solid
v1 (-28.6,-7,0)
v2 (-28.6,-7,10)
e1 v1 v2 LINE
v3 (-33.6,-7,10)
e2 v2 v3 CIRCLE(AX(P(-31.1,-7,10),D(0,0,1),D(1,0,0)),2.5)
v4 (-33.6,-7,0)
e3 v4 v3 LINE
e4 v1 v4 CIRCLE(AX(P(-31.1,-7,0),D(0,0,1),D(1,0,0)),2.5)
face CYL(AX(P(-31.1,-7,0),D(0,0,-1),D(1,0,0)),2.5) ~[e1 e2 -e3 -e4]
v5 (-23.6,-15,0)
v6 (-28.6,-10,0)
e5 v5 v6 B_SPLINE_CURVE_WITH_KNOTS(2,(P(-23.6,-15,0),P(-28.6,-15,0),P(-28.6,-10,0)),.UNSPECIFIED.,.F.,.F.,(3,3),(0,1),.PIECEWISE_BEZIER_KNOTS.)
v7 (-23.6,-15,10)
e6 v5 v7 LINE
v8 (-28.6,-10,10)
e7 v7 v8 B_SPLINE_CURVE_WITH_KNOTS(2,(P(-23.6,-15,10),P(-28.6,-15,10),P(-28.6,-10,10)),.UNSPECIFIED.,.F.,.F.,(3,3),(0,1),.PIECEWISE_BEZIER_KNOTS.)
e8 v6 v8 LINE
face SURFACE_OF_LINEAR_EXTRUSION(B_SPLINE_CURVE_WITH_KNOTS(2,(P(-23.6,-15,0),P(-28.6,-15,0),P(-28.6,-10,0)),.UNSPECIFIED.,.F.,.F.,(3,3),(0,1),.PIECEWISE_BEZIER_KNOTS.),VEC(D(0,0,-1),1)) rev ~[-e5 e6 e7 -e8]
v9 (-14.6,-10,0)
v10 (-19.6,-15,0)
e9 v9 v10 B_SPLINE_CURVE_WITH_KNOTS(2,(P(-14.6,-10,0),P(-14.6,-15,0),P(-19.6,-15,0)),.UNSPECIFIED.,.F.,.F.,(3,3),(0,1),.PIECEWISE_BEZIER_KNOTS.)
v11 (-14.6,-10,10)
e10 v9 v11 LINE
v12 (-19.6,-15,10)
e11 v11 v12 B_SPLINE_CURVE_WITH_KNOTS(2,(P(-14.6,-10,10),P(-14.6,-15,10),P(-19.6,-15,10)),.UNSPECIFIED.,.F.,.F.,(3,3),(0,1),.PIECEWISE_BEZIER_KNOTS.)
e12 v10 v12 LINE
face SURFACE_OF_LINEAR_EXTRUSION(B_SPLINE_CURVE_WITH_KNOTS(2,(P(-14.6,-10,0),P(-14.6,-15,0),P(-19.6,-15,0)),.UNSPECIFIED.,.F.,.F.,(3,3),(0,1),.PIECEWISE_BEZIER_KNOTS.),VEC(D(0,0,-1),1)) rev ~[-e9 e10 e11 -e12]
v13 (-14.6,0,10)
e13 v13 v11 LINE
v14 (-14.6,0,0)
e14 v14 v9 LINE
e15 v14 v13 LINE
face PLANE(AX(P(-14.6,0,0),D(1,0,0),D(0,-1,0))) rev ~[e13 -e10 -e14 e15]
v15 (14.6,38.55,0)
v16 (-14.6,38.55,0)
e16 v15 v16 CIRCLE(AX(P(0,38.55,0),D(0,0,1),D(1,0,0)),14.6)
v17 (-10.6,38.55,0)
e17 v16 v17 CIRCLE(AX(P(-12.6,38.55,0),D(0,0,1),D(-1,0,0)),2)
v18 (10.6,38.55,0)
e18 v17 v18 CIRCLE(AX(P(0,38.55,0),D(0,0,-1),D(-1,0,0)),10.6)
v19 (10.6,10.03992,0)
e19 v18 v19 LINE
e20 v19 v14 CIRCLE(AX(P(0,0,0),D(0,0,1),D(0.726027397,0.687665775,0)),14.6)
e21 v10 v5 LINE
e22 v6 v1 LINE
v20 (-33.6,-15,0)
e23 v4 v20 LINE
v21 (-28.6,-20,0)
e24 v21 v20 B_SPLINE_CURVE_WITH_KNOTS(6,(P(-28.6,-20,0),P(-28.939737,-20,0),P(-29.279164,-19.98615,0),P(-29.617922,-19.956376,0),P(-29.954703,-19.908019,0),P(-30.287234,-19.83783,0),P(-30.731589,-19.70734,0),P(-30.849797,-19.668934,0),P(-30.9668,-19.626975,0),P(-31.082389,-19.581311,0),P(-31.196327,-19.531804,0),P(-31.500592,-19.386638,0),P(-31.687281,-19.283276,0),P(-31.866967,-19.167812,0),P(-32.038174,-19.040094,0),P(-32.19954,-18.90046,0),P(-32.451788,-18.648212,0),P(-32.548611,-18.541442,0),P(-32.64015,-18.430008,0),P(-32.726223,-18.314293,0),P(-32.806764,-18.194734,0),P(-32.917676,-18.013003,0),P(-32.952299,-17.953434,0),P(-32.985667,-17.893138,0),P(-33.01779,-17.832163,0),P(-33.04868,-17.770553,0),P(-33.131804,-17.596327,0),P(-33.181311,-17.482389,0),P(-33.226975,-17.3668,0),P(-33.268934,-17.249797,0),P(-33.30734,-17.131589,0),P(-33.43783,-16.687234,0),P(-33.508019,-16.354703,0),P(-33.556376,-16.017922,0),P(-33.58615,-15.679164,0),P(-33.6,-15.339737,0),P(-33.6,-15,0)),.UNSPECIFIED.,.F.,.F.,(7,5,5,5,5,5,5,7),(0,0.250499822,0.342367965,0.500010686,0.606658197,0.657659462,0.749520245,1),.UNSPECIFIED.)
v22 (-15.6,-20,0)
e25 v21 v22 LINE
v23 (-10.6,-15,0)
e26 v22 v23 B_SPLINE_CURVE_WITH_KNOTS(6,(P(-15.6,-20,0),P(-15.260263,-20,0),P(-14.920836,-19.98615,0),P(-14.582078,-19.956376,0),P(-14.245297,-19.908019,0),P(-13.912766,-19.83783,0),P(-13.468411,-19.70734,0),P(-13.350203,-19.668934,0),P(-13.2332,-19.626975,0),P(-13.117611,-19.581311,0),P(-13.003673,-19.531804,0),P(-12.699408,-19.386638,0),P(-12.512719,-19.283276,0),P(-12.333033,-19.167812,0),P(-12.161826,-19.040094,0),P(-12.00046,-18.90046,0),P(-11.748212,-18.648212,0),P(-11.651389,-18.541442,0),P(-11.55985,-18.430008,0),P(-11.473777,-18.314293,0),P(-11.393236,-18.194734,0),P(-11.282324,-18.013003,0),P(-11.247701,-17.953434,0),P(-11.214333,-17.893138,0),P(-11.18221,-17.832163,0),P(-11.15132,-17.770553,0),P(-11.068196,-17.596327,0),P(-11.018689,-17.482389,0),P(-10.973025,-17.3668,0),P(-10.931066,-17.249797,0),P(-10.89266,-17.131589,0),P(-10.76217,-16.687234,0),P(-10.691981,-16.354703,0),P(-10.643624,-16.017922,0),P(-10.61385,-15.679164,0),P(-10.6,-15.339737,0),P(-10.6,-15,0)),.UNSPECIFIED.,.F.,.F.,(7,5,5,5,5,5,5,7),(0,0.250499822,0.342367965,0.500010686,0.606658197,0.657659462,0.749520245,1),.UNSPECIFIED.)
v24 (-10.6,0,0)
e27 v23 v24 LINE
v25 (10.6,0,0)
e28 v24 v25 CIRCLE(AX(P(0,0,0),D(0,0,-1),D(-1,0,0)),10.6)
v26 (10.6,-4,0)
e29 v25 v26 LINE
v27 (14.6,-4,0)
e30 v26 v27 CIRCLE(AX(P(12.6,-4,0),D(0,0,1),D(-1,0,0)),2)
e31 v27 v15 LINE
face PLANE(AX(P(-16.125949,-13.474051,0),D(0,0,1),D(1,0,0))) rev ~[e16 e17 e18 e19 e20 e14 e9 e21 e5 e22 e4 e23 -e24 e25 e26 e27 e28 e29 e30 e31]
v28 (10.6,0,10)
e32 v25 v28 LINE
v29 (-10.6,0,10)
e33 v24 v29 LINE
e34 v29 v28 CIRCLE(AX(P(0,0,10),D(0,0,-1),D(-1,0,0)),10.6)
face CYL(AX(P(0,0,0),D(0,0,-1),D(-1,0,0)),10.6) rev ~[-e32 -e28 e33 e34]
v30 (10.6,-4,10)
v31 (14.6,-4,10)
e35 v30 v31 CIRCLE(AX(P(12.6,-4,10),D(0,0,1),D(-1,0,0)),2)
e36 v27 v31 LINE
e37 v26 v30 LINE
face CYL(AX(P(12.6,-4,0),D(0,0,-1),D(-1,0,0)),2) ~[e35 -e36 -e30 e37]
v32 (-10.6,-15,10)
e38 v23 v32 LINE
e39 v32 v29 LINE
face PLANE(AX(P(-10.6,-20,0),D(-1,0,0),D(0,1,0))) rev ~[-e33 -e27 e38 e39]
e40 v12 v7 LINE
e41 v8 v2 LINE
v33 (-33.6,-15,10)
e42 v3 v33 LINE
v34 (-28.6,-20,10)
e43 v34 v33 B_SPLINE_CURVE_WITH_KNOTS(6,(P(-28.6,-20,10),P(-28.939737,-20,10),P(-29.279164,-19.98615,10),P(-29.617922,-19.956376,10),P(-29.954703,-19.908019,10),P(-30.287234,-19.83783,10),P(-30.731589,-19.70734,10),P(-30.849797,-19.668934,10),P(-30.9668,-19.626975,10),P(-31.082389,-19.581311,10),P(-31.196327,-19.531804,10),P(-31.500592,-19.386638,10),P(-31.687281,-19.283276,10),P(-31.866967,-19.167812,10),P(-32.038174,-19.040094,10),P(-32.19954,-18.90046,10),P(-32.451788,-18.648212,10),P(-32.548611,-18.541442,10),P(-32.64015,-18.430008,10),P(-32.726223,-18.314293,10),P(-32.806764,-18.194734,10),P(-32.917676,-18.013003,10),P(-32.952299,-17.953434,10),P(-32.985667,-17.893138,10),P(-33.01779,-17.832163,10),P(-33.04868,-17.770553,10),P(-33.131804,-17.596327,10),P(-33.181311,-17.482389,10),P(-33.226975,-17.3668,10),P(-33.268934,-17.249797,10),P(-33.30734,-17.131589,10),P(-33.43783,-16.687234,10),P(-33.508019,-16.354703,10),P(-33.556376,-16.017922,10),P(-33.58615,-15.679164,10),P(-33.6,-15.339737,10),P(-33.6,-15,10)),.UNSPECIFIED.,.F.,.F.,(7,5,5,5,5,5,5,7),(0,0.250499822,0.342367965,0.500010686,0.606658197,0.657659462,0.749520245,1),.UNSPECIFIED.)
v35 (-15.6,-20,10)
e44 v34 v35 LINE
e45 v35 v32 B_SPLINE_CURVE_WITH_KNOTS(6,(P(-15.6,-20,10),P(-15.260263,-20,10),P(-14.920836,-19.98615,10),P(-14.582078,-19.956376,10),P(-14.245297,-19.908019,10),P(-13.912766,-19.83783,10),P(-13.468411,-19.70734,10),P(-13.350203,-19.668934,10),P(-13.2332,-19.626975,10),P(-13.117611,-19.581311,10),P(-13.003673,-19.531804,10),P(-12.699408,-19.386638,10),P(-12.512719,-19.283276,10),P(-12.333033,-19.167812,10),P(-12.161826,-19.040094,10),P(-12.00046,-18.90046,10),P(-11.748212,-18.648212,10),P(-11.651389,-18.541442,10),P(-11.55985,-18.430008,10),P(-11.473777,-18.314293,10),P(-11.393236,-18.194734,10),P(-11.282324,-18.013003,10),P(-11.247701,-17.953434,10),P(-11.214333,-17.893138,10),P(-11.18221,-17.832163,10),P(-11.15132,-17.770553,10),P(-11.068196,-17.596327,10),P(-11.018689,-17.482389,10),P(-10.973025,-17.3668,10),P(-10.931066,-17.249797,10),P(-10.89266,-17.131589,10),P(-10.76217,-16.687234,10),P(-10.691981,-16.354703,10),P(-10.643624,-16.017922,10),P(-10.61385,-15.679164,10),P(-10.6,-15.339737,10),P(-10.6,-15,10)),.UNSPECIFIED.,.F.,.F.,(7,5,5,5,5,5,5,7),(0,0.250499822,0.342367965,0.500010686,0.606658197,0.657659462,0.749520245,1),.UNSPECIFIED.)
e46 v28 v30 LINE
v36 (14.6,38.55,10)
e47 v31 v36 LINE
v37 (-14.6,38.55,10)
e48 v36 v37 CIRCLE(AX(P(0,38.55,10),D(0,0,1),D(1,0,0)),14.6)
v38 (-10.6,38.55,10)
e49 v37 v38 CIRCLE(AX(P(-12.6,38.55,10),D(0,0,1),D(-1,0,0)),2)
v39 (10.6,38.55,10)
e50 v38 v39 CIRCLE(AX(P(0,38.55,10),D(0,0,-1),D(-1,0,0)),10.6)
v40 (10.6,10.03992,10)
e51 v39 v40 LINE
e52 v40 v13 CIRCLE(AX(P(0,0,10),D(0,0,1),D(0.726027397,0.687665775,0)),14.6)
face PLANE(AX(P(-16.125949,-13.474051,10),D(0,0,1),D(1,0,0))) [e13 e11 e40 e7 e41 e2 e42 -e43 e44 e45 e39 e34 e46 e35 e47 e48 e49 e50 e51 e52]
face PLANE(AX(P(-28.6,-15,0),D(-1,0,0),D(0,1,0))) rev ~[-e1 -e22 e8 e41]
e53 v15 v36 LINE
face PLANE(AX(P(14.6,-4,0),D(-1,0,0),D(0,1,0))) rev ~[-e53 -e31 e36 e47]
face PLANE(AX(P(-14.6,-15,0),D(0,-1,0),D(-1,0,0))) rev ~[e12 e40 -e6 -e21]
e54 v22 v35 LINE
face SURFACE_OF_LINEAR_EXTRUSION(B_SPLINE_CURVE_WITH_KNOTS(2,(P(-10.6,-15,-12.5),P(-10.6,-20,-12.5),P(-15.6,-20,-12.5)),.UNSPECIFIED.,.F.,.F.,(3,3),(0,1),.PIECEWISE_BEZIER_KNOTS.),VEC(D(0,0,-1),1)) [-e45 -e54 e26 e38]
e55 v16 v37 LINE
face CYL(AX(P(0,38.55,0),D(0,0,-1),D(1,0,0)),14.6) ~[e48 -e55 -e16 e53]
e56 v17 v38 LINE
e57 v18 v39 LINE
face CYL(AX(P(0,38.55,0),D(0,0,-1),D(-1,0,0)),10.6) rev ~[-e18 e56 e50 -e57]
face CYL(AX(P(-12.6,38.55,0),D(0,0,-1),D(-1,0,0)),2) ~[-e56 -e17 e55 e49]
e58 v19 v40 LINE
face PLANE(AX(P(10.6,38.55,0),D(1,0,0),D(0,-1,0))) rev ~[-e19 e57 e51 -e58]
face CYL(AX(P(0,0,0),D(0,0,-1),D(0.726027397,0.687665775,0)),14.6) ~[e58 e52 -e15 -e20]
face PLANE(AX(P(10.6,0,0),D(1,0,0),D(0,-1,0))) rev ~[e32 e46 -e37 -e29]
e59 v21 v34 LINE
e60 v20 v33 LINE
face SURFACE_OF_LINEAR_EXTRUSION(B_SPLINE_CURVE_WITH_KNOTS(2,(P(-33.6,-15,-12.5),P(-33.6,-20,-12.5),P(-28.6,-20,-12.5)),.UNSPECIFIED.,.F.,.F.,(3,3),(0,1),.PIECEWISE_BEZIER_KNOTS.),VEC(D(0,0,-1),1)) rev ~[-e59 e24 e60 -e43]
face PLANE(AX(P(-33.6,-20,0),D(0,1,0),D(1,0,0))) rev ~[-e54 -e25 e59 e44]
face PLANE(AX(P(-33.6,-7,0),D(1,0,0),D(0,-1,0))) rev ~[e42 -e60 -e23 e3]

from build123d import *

# Parameters (mm, degrees)
F1_DEPTH    = 10
F2_T1_DEPTH = 10
F2_T3_DEPTH = 35


# Not quite as in the source:
# - a fillet or chamfer that OpenCascade refuses, or shapes differently, is made with other operations: its cross-section is extruded or revolved along the edge and cut away or added


with BuildPart() as f1:
    # F0 (on Top) → F1 (new body)
    with BuildSketch(Plane.XY):
        with BuildLine():
            Line((14.6, -4), (14.6, 38.55))
            ThreePointArc((14.6, 38.55), (0, 53.15), (-14.6, 38.55))
            ThreePointArc((-14.6, 38.55), (-12.6, 36.55), (-10.6, 38.55))
            ThreePointArc((-10.6, 38.55), (0, 49.15), (10.6, 38.55))
            Line((10.6, 38.55), (10.6, 10.0399203184))
            ThreePointArc((10.6, 10.0399203184), (-5.4037024344, 13.5631854665), (-14.6, 0))
            Line((-14.6, 0), (-14.6, -15))
            Line((-14.6, -15), (-28.6, -15))
            Line((-28.6, -15), (-28.6, -7))
            ThreePointArc((-28.6, -7), (-31.1, -4.5), (-33.6, -7))
            Line((-33.6, -7), (-33.6, -20))
            Line((-33.6, -20), (-10.6, -20))
            Line((-10.6, -20), (-10.6, 0))
            ThreePointArc((-10.6, 0), (0, 10.6), (10.6, 0))
            Line((10.6, 0), (10.6, -4))
            ThreePointArc((10.6, -4), (12.6, -6), (14.6, -4))
        make_face()
    extrude(amount=F1_DEPTH)

    # F2: fillet of radius 5 on 4 edges, made by hand

    # F2_s2 → F2_t1 (join)
    with BuildSketch(Plane.XY):
        with BuildLine():
            add(Edge.make_bspline(
                [(-14.6, -10), (-14.6, -15), (-19.6, -15)],
                knots=[0, 0, 0, 1, 1, 1], degree=2, weights=[1, 1, 1]))
            Line((-19.6, -15), (-14.6, -15))
            Line((-14.6, -15), (-14.6, -10))
        make_face()
        with BuildLine():
            add(Edge.make_bspline(
                [(-23.6, -15), (-28.6, -15), (-28.6, -10)],
                knots=[0, 0, 0, 1, 1, 1], degree=2, weights=[1, 1, 1]))
            Line((-28.6, -10), (-28.6, -15))
            Line((-28.6, -15), (-23.6, -15))
        make_face()
    extrude(amount=F2_T1_DEPTH)

    # F2_s4 → F2_t3 (cut)
    with BuildSketch(Plane.XY.offset(-12.5)):
        with BuildLine():
            add(Edge.make_bspline(
                [(-33.6, -15), (-33.6, -20), (-28.6, -20)],
                knots=[0, 0, 0, 1, 1, 1], degree=2, weights=[1, 1, 1]))
            Line((-28.6, -20), (-33.6, -20))
            Line((-33.6, -20), (-33.6, -15))
        make_face()
        with BuildLine():
            add(Edge.make_bspline(
                [(-10.6, -15), (-10.6, -20), (-15.6, -20)],
                knots=[0, 0, 0, 1, 1, 1], degree=2, weights=[1, 1, 1]))
            Line((-15.6, -20), (-10.6, -20))
            Line((-10.6, -20), (-10.6, -15))
        make_face()
    extrude(amount=F2_T3_DEPTH, mode=Mode.SUBTRACT)


solid = f1.part
